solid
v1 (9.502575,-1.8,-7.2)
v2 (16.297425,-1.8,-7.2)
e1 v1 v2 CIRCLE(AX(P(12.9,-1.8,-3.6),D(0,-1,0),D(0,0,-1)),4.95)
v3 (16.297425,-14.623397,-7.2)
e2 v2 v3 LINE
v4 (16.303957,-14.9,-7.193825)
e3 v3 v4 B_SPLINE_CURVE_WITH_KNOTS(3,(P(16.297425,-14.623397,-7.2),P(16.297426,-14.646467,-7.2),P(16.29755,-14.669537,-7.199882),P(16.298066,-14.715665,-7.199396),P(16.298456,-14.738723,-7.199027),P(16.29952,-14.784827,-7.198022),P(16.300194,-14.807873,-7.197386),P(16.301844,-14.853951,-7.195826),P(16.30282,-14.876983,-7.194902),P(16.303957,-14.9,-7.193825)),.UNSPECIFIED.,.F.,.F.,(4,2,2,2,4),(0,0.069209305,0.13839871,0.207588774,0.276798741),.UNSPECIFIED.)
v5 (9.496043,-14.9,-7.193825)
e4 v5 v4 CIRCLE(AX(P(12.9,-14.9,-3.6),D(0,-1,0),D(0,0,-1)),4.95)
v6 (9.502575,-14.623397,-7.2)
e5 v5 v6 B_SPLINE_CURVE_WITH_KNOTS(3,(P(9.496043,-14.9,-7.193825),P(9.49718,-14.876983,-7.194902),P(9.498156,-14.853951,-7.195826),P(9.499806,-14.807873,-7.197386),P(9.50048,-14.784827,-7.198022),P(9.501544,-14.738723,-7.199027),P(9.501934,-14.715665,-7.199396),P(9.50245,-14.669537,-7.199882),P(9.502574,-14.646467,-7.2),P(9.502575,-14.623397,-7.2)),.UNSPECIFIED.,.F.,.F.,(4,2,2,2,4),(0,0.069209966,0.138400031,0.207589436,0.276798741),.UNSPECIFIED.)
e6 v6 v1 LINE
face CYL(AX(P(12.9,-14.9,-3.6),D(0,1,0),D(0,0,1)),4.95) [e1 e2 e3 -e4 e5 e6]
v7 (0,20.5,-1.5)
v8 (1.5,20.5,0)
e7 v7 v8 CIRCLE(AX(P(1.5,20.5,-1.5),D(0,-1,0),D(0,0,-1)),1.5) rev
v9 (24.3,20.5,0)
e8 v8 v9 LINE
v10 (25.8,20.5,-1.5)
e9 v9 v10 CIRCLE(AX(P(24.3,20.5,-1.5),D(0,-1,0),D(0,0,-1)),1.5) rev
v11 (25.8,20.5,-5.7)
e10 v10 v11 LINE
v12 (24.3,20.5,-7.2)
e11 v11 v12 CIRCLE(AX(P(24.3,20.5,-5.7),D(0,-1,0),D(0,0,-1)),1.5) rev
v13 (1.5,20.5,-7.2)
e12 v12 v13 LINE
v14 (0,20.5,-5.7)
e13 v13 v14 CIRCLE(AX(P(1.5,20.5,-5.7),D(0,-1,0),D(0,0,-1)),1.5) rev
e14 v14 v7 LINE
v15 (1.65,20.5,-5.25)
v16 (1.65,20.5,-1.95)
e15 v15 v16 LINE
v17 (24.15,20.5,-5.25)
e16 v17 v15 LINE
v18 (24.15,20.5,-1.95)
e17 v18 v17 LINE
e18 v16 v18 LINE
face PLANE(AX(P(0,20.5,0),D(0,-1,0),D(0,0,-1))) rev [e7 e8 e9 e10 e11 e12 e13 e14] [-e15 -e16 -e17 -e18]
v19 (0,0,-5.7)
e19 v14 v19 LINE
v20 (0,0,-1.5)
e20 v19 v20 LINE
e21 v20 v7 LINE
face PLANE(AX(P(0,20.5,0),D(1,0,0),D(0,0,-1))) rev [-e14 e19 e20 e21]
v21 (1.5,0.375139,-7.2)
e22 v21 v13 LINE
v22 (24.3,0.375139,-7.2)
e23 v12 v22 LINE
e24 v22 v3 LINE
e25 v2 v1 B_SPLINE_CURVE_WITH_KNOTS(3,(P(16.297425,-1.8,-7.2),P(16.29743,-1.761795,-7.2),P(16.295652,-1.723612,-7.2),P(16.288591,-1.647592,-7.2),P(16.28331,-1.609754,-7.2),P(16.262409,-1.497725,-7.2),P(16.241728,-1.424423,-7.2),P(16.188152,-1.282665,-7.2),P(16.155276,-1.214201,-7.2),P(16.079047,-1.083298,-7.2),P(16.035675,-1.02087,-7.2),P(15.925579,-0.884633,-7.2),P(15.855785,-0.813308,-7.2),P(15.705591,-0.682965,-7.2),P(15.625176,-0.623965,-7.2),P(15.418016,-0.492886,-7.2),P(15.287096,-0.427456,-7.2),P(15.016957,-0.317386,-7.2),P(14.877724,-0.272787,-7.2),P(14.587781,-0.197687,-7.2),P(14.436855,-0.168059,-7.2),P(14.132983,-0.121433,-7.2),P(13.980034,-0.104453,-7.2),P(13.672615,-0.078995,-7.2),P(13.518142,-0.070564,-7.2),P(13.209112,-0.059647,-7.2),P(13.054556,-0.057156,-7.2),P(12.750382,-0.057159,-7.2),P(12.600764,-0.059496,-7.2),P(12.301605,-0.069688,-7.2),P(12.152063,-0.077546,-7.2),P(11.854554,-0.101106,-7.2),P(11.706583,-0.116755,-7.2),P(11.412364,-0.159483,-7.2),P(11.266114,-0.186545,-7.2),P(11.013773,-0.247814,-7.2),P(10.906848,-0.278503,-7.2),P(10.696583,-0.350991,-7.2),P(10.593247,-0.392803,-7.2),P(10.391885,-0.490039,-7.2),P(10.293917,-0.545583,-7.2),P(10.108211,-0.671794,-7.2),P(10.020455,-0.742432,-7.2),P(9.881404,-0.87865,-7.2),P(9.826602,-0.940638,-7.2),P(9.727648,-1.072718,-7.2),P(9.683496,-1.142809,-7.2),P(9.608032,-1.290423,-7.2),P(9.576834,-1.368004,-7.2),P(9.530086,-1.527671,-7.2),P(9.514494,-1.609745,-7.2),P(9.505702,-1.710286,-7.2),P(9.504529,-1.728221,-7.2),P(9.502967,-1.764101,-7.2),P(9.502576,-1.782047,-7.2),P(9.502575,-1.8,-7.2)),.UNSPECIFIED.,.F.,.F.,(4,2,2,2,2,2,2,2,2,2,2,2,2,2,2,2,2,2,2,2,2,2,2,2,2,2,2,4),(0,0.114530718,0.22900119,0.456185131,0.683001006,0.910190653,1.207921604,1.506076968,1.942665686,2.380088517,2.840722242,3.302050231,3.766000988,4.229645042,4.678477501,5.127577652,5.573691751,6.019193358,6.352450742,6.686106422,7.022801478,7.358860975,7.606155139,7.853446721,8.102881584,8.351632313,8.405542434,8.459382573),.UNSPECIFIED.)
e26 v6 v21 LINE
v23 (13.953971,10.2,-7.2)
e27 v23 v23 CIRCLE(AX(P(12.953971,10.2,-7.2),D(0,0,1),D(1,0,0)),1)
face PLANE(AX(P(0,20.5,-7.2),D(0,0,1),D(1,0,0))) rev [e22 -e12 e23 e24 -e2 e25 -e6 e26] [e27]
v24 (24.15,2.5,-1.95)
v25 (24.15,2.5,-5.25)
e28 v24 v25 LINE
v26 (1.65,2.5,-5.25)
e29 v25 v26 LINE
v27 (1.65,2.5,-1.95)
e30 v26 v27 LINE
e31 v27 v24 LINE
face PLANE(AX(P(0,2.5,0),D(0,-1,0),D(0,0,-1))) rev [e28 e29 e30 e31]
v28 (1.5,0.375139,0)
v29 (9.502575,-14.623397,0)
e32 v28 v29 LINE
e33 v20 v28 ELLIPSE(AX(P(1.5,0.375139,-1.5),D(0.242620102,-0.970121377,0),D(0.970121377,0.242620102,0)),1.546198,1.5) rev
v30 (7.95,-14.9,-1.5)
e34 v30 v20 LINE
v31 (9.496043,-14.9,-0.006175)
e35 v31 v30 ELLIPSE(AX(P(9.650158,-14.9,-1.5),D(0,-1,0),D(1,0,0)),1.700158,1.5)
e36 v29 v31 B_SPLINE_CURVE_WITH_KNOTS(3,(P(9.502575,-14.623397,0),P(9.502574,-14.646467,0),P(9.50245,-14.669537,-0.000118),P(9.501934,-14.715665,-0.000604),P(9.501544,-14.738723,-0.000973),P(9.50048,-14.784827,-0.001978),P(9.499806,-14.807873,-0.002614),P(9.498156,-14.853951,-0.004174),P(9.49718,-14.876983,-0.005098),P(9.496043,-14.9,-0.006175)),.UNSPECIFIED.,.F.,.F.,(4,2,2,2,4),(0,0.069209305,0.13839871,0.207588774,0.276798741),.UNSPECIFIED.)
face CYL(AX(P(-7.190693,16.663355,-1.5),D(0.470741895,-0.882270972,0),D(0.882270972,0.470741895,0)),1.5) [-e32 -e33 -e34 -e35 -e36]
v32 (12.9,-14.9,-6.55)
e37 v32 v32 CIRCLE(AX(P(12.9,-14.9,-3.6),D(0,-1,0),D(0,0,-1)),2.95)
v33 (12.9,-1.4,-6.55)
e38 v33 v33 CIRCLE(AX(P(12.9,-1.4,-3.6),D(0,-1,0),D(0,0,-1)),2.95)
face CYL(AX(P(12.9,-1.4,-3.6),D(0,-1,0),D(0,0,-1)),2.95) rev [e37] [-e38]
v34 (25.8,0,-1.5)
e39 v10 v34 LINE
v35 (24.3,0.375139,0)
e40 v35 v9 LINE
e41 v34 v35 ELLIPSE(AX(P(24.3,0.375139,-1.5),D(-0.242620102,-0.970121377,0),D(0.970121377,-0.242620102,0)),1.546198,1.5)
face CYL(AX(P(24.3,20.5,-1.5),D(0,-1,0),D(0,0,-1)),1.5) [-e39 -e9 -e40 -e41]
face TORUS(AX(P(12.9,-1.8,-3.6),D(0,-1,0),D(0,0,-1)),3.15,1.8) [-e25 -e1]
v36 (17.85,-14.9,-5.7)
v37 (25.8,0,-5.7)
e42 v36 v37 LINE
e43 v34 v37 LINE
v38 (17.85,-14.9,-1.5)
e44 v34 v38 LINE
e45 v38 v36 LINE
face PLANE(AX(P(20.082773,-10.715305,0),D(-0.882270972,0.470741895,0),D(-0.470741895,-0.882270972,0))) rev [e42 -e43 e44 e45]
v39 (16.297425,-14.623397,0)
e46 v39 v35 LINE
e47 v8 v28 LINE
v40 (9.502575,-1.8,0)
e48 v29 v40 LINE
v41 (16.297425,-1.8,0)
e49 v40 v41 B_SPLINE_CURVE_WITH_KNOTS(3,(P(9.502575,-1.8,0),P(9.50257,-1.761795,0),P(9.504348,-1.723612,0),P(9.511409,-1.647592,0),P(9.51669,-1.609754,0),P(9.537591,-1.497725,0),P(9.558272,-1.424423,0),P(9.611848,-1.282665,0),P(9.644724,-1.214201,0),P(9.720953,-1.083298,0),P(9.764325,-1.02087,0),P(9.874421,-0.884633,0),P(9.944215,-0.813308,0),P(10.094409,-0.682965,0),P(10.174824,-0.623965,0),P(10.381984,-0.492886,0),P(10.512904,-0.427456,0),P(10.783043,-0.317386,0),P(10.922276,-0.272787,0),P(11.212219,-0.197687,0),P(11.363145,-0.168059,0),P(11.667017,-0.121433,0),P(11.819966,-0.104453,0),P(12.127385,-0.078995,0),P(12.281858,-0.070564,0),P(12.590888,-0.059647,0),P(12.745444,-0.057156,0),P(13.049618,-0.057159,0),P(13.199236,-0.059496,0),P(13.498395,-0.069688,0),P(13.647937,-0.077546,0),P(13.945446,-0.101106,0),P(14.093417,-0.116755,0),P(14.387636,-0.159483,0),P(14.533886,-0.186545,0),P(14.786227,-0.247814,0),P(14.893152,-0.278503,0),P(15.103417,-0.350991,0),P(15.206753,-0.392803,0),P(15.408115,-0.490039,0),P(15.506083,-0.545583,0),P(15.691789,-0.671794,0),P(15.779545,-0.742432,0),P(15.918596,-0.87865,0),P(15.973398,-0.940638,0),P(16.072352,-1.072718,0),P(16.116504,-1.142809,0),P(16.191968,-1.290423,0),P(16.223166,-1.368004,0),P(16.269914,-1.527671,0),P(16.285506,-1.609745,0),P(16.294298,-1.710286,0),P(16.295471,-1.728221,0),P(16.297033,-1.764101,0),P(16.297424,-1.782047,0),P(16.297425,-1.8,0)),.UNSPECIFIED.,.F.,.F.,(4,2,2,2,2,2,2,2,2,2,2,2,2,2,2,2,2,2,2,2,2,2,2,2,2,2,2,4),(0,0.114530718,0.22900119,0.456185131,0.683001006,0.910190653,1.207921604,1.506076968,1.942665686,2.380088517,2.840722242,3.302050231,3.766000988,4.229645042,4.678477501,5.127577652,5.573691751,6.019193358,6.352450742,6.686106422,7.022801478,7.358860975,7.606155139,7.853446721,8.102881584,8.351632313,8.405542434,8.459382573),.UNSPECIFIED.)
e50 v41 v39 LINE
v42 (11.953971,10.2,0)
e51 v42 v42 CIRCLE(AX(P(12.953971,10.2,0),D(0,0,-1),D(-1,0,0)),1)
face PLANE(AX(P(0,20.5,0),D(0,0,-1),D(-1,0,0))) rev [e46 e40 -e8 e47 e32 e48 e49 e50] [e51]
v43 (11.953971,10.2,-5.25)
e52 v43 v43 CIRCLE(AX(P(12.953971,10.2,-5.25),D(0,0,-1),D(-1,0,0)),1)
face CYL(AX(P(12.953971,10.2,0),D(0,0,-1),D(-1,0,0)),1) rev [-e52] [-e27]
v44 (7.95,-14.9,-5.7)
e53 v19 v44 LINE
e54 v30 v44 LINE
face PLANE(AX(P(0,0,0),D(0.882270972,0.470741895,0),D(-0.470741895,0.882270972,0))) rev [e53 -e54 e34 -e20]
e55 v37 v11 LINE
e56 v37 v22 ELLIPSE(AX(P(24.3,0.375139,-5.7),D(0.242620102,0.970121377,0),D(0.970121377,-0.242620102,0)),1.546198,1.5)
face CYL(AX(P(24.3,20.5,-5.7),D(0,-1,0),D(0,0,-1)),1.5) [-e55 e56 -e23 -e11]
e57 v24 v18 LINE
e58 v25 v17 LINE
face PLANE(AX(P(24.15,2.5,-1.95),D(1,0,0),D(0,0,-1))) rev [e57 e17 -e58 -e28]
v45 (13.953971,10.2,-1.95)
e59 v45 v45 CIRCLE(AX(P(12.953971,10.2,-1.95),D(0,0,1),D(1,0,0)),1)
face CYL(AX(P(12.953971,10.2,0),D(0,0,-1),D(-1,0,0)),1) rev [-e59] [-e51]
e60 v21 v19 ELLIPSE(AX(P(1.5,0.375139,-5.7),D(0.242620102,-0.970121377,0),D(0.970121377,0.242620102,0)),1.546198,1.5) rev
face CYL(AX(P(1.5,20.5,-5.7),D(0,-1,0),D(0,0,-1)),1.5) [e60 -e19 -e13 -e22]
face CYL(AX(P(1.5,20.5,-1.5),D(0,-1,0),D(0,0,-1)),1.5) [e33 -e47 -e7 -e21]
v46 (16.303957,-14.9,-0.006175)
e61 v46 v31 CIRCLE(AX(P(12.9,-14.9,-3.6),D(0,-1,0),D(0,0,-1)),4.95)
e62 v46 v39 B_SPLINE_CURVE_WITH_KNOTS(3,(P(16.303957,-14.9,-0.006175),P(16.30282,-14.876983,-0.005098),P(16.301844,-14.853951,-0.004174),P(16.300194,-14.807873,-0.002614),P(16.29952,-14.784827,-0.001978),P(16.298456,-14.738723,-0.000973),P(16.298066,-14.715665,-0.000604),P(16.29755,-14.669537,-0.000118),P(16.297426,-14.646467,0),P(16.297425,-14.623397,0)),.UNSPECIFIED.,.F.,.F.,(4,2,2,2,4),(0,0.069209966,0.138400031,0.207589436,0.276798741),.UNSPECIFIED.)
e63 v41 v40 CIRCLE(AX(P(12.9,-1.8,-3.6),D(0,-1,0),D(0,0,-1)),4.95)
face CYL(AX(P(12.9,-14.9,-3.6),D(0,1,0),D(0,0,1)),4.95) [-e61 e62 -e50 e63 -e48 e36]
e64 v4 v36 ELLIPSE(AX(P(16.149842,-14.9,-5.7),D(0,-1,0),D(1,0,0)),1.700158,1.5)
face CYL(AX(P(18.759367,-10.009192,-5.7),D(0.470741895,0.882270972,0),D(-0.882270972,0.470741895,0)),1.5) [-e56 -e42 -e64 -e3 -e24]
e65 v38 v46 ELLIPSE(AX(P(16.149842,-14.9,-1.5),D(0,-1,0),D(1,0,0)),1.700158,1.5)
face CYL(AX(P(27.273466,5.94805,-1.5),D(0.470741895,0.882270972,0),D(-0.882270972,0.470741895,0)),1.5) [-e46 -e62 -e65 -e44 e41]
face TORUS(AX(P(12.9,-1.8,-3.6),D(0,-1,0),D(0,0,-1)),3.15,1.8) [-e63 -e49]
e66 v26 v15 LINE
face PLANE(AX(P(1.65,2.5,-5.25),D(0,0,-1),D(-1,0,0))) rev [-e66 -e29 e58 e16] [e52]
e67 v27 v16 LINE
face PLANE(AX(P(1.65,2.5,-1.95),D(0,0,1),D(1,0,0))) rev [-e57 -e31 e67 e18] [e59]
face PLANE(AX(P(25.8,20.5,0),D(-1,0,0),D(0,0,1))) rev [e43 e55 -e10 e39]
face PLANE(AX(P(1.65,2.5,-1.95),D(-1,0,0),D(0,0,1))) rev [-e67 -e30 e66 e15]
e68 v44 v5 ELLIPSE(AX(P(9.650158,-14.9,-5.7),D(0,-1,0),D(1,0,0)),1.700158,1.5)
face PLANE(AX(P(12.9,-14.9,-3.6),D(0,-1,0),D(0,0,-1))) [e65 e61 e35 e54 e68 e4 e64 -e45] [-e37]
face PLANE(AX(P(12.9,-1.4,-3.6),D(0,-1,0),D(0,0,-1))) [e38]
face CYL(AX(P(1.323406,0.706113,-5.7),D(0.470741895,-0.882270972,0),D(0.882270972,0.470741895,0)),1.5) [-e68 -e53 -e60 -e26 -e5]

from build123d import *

# Parameters (mm, degrees)
SKETCH2_W               = 25.8
SKETCH2_H               = 7.2
BOSS_EXTRUDE1_DEPTH     = 20.5
SKETCH3_W               = 22.5
SKETCH3_H               = 3.3
CUT_EXTRUDE1_DEPTH      = 18
CUT_EXTRUDE2_DEPTH      = 34.730253483
CUT_EXTRUDE2_DEPTH_BACK = 34.730253483
SKETCH4_R               = 1
SKETCH9_R               = 4.95
BOSS_EXTRUDE6_DEPTH     = 14.9
BOSS_EXTRUDE7_DEPTH     = 7.2
SKETCH12_R              = 2.95
CUT_EXTRUDE5_DEPTH      = 13.5
FILLET2_R               = 1.5
FILLET3_R               = 1.8


with BuildPart() as part:
    # Sketch2 → Boss-Extrude1 (new body)
    with BuildSketch(Plane(origin=(0, 0, 0), x_dir=(1, 0, 0), z_dir=(0, 1, 0))):
        with Locations((12.9, 3.6)):
            Rectangle(SKETCH2_W, SKETCH2_H)
    extrude(amount=BOSS_EXTRUDE1_DEPTH)

    # Sketch3 → Cut-Extrude1 (cut)
    with BuildSketch(Plane(origin=(0, 20.5, 0), x_dir=(1, 0, 0), z_dir=(0, 1, 0))):
        with Locations((12.9, 3.6)):
            Rectangle(SKETCH3_W, SKETCH3_H)
    extrude(amount=-CUT_EXTRUDE1_DEPTH, mode=Mode.SUBTRACT)

    # Sketch4 → Cut-Extrude2 (cut, two sides: drawn at the far end of the back side and taken through both)
    with BuildSketch(Plane(origin=(0, 0, -7.2), x_dir=(-1, 0, 0), z_dir=(0, 0, -1)).offset(-CUT_EXTRUDE2_DEPTH_BACK)):
        with Locations((-12.953971153, 10.2)):
            Circle(SKETCH4_R)
    extrude(amount=CUT_EXTRUDE2_DEPTH + CUT_EXTRUDE2_DEPTH_BACK, mode=Mode.SUBTRACT)

    # Sketch9 → Boss-Extrude6 (add)
    with BuildSketch(Plane(origin=(0, 0, 0), x_dir=(-1, 0, 0), z_dir=(0, -1, 0))):
        with Locations(Location((-12.9, 3.6, 0), (0, 0, 226.658241773))):
            Circle(SKETCH9_R)
    extrude(amount=BOSS_EXTRUDE6_DEPTH)

    # Sketch11 → Boss-Extrude7 (add)
    with BuildSketch(Plane(origin=(0, 0, -7.2), x_dir=(-1, 0, 0), z_dir=(0, 0, -1))):
        Polygon((-9.502574504, 0), (-12.9, 0), (-12.9, -14.9), (-7.95, -14.9), (0, 0), align=None)
        Polygon((-12.9, -14.9), (-12.9, 0), (-16.297425496, 0), (-25.8, 0), (-17.85, -14.9), align=None)
    extrude(amount=-BOSS_EXTRUDE7_DEPTH)

    # Sketch12 → Cut-Extrude5 (cut)
    with BuildSketch(Plane(origin=(0, -14.9, 0), x_dir=(-1, 0, 0), z_dir=(0, -1, 0))):
        with Locations(Location((-12.9, 3.6, 0), (0, 0, 90))):
            Circle(SKETCH12_R)
    extrude(amount=-CUT_EXTRUDE5_DEPTH, mode=Mode.SUBTRACT)

    # Fillet2
    # the kernel refuses this fillet: 1.5 mm, written as the material it takes off along each edge
    with BuildSketch(Plane(origin=(0, -3.75, -7.2), x_dir=(0, 0, 1), z_dir=(0, 1, 0)), Plane(origin=(0, -3.75, 0), x_dir=(1, 0, 0), z_dir=(0, 1, 0))) as fillet2_piece_1:
        with BuildLine():
            CenterArc((FILLET2_R, FILLET2_R), FILLET2_R, 180, 90)
            Line((0, FILLET2_R), (0, 0))
            Line((0, 0), (FILLET2_R, 0))
        make_face()
    extrude(amount=28, mode=Mode.SUBTRACT)
    with BuildSketch(Plane(origin=(9.715282105, -18.208516146, -7.2), x_dir=(0, 0, 1), z_dir=(-0.47074189463756383, 0.8822709723395851, 0))) as fillet2_piece_2_section:
        with BuildLine():
            CenterArc((FILLET2_R, FILLET2_R), FILLET2_R, 180, 90)
            Line((0, FILLET2_R), (0, 0))
            Line((0, 0), (FILLET2_R, 0))
        make_face()
    fillet2_piece_2 = extrude(amount=24.38823555, mode=Mode.PRIVATE)
    fillet2_piece_2 = fillet2_piece_2 - Plane(origin=(12.9, -7.082671963, -3.6), x_dir=(0.686348585021791, 0, 0.727272727275391), z_dir=(0, 1, 0)) * Cylinder(4.95, 55, mode=Mode.PRIVATE)
    add(fillet2_piece_2, mode=Mode.SUBTRACT)
    with BuildSketch(Plane(origin=(9.715282105, -18.208516146, 0), x_dir=(0.8822709723395851, 0.4707418946375639, 0), z_dir=(-0.47074189463756383, 0.8822709723395851, 0))) as fillet2_piece_3_section:
        with BuildLine():
            CenterArc((FILLET2_R, FILLET2_R), FILLET2_R, 180, 90)
            Line((0, FILLET2_R), (0, 0))
            Line((0, 0), (FILLET2_R, 0))
        make_face()
    fillet2_piece_3 = extrude(amount=24.38823555, mode=Mode.PRIVATE)
    fillet2_piece_3 = fillet2_piece_3 - Plane(origin=(12.9, -7.08267196, -3.6), x_dir=(0.686348585021791, 0, 0.727272727275391), z_dir=(0, 1, 0)) * Cylinder(4.95, 55, mode=Mode.PRIVATE)
    add(fillet2_piece_3, mode=Mode.SUBTRACT)
    with BuildSketch(Plane(origin=(27.565282105, 3.308516146, -7.2), x_dir=(0, 0, 1), z_dir=(-0.4707418946375641, -0.882270972339585, 0))) as fillet2_piece_4_section:
        with BuildLine():
            CenterArc((FILLET2_R, FILLET2_R), FILLET2_R, 180, 90)
            Line((0, FILLET2_R), (0, 0))
            Line((0, 0), (FILLET2_R, 0))
        make_face()
    fillet2_piece_4 = extrude(amount=24.38823555, mode=Mode.PRIVATE)
    fillet2_piece_4 = fillet2_piece_4 - Plane(origin=(12.9, -7.082671987, -3.6), x_dir=(0.686348585021791, 0, 0.727272727275391), z_dir=(0, 1, 0)) * Cylinder(4.95, 55, mode=Mode.PRIVATE)
    add(fillet2_piece_4, mode=Mode.SUBTRACT)
    with BuildSketch(Plane(origin=(27.565282105, 3.308516146, 0), x_dir=(-0.8822709723395848, 0.47074189463756405, 0), z_dir=(-0.4707418946375641, -0.882270972339585, 0))) as fillet2_piece_5_section:
        with BuildLine():
            CenterArc((FILLET2_R, FILLET2_R), FILLET2_R, 180, 90)
            Line((0, FILLET2_R), (0, 0))
            Line((0, 0), (FILLET2_R, 0))
        make_face()
    fillet2_piece_5 = extrude(amount=24.38823555, mode=Mode.PRIVATE)
    fillet2_piece_5 = fillet2_piece_5 - Plane(origin=(12.9, -7.082671971, -3.6), x_dir=(0.686348585021791, 0, 0.727272727275391), z_dir=(0, 1, 0)) * Cylinder(4.95, 55, mode=Mode.PRIVATE)
    add(fillet2_piece_5, mode=Mode.SUBTRACT)
    with BuildSketch(Plane(origin=(25.8, -3.75, 0), x_dir=(-1, 0, 0), z_dir=(0, 1, 0)), Plane(origin=(25.8, -3.75, -7.2), x_dir=(0, 0, 1), z_dir=(0, 1, 0))) as fillet2_piece_6:
        with BuildLine():
            CenterArc((FILLET2_R, -FILLET2_R), FILLET2_R, 90, 90)
            Line((0, -FILLET2_R), (0, 0))
            Line((0, 0), (FILLET2_R, 0))
        make_face()
    extrude(amount=28, mode=Mode.SUBTRACT)

    # Fillet3
    # the kernel refuses this fillet: 1.8 mm, written as the material it takes off along each edge
    with BuildSketch(Plane(origin=(12.9, 0, -3.6), x_dir=(0.9954823771301547, 0, -0.09494649452874186), z_dir=(-0.09494649452874186, 0, -0.9954823771301547))) as fillet3_piece_1_section:
        with BuildLine():
            CenterArc((4.95 - FILLET3_R, FILLET3_R), FILLET3_R, 270, 90)
            Line((4.95 - FILLET3_R, 0), (4.95, 0))
            Line((4.95, 0), (4.95, FILLET3_R))
        make_face()
    fillet3_piece_1 = revolve(axis=Axis((12.9, 0, -3.6), (0, -1, 0)), revolution_arc=190.896480509, mode=Mode.PRIVATE)
    fillet3_piece_1 = split(fillet3_piece_1, bisect_by=Plane(origin=(12.9, -0.687334204, 0), z_dir=(0, 0, 1)), keep=Keep.TOP, mode=Mode.PRIVATE)
    add(fillet3_piece_1, mode=Mode.SUBTRACT)
    with BuildSketch(Plane(origin=(12.9, 0, -3.6), x_dir=(-0.9954823771297855, 0, 0.09494649453261288), z_dir=(0.09494649453261288, 0, 0.9954823771297855))) as fillet3_piece_2_section:
        with BuildLine():
            CenterArc((4.95 - FILLET3_R, FILLET3_R), FILLET3_R, 270, 90)
            Line((4.95 - FILLET3_R, 0), (4.95, 0))
            Line((4.95, 0), (4.95, FILLET3_R))
        make_face()
    fillet3_piece_2 = revolve(axis=Axis((12.9, 0, -3.6), (0, -1, 0)), revolution_arc=190.89648051, mode=Mode.PRIVATE)
    fillet3_piece_2 = split(fillet3_piece_2, bisect_by=Plane(origin=(12.9, -0.687334204, -7.2), z_dir=(0, 0, -1)), keep=Keep.TOP, mode=Mode.PRIVATE)
    add(fillet3_piece_2, mode=Mode.SUBTRACT)


solid = part.part
